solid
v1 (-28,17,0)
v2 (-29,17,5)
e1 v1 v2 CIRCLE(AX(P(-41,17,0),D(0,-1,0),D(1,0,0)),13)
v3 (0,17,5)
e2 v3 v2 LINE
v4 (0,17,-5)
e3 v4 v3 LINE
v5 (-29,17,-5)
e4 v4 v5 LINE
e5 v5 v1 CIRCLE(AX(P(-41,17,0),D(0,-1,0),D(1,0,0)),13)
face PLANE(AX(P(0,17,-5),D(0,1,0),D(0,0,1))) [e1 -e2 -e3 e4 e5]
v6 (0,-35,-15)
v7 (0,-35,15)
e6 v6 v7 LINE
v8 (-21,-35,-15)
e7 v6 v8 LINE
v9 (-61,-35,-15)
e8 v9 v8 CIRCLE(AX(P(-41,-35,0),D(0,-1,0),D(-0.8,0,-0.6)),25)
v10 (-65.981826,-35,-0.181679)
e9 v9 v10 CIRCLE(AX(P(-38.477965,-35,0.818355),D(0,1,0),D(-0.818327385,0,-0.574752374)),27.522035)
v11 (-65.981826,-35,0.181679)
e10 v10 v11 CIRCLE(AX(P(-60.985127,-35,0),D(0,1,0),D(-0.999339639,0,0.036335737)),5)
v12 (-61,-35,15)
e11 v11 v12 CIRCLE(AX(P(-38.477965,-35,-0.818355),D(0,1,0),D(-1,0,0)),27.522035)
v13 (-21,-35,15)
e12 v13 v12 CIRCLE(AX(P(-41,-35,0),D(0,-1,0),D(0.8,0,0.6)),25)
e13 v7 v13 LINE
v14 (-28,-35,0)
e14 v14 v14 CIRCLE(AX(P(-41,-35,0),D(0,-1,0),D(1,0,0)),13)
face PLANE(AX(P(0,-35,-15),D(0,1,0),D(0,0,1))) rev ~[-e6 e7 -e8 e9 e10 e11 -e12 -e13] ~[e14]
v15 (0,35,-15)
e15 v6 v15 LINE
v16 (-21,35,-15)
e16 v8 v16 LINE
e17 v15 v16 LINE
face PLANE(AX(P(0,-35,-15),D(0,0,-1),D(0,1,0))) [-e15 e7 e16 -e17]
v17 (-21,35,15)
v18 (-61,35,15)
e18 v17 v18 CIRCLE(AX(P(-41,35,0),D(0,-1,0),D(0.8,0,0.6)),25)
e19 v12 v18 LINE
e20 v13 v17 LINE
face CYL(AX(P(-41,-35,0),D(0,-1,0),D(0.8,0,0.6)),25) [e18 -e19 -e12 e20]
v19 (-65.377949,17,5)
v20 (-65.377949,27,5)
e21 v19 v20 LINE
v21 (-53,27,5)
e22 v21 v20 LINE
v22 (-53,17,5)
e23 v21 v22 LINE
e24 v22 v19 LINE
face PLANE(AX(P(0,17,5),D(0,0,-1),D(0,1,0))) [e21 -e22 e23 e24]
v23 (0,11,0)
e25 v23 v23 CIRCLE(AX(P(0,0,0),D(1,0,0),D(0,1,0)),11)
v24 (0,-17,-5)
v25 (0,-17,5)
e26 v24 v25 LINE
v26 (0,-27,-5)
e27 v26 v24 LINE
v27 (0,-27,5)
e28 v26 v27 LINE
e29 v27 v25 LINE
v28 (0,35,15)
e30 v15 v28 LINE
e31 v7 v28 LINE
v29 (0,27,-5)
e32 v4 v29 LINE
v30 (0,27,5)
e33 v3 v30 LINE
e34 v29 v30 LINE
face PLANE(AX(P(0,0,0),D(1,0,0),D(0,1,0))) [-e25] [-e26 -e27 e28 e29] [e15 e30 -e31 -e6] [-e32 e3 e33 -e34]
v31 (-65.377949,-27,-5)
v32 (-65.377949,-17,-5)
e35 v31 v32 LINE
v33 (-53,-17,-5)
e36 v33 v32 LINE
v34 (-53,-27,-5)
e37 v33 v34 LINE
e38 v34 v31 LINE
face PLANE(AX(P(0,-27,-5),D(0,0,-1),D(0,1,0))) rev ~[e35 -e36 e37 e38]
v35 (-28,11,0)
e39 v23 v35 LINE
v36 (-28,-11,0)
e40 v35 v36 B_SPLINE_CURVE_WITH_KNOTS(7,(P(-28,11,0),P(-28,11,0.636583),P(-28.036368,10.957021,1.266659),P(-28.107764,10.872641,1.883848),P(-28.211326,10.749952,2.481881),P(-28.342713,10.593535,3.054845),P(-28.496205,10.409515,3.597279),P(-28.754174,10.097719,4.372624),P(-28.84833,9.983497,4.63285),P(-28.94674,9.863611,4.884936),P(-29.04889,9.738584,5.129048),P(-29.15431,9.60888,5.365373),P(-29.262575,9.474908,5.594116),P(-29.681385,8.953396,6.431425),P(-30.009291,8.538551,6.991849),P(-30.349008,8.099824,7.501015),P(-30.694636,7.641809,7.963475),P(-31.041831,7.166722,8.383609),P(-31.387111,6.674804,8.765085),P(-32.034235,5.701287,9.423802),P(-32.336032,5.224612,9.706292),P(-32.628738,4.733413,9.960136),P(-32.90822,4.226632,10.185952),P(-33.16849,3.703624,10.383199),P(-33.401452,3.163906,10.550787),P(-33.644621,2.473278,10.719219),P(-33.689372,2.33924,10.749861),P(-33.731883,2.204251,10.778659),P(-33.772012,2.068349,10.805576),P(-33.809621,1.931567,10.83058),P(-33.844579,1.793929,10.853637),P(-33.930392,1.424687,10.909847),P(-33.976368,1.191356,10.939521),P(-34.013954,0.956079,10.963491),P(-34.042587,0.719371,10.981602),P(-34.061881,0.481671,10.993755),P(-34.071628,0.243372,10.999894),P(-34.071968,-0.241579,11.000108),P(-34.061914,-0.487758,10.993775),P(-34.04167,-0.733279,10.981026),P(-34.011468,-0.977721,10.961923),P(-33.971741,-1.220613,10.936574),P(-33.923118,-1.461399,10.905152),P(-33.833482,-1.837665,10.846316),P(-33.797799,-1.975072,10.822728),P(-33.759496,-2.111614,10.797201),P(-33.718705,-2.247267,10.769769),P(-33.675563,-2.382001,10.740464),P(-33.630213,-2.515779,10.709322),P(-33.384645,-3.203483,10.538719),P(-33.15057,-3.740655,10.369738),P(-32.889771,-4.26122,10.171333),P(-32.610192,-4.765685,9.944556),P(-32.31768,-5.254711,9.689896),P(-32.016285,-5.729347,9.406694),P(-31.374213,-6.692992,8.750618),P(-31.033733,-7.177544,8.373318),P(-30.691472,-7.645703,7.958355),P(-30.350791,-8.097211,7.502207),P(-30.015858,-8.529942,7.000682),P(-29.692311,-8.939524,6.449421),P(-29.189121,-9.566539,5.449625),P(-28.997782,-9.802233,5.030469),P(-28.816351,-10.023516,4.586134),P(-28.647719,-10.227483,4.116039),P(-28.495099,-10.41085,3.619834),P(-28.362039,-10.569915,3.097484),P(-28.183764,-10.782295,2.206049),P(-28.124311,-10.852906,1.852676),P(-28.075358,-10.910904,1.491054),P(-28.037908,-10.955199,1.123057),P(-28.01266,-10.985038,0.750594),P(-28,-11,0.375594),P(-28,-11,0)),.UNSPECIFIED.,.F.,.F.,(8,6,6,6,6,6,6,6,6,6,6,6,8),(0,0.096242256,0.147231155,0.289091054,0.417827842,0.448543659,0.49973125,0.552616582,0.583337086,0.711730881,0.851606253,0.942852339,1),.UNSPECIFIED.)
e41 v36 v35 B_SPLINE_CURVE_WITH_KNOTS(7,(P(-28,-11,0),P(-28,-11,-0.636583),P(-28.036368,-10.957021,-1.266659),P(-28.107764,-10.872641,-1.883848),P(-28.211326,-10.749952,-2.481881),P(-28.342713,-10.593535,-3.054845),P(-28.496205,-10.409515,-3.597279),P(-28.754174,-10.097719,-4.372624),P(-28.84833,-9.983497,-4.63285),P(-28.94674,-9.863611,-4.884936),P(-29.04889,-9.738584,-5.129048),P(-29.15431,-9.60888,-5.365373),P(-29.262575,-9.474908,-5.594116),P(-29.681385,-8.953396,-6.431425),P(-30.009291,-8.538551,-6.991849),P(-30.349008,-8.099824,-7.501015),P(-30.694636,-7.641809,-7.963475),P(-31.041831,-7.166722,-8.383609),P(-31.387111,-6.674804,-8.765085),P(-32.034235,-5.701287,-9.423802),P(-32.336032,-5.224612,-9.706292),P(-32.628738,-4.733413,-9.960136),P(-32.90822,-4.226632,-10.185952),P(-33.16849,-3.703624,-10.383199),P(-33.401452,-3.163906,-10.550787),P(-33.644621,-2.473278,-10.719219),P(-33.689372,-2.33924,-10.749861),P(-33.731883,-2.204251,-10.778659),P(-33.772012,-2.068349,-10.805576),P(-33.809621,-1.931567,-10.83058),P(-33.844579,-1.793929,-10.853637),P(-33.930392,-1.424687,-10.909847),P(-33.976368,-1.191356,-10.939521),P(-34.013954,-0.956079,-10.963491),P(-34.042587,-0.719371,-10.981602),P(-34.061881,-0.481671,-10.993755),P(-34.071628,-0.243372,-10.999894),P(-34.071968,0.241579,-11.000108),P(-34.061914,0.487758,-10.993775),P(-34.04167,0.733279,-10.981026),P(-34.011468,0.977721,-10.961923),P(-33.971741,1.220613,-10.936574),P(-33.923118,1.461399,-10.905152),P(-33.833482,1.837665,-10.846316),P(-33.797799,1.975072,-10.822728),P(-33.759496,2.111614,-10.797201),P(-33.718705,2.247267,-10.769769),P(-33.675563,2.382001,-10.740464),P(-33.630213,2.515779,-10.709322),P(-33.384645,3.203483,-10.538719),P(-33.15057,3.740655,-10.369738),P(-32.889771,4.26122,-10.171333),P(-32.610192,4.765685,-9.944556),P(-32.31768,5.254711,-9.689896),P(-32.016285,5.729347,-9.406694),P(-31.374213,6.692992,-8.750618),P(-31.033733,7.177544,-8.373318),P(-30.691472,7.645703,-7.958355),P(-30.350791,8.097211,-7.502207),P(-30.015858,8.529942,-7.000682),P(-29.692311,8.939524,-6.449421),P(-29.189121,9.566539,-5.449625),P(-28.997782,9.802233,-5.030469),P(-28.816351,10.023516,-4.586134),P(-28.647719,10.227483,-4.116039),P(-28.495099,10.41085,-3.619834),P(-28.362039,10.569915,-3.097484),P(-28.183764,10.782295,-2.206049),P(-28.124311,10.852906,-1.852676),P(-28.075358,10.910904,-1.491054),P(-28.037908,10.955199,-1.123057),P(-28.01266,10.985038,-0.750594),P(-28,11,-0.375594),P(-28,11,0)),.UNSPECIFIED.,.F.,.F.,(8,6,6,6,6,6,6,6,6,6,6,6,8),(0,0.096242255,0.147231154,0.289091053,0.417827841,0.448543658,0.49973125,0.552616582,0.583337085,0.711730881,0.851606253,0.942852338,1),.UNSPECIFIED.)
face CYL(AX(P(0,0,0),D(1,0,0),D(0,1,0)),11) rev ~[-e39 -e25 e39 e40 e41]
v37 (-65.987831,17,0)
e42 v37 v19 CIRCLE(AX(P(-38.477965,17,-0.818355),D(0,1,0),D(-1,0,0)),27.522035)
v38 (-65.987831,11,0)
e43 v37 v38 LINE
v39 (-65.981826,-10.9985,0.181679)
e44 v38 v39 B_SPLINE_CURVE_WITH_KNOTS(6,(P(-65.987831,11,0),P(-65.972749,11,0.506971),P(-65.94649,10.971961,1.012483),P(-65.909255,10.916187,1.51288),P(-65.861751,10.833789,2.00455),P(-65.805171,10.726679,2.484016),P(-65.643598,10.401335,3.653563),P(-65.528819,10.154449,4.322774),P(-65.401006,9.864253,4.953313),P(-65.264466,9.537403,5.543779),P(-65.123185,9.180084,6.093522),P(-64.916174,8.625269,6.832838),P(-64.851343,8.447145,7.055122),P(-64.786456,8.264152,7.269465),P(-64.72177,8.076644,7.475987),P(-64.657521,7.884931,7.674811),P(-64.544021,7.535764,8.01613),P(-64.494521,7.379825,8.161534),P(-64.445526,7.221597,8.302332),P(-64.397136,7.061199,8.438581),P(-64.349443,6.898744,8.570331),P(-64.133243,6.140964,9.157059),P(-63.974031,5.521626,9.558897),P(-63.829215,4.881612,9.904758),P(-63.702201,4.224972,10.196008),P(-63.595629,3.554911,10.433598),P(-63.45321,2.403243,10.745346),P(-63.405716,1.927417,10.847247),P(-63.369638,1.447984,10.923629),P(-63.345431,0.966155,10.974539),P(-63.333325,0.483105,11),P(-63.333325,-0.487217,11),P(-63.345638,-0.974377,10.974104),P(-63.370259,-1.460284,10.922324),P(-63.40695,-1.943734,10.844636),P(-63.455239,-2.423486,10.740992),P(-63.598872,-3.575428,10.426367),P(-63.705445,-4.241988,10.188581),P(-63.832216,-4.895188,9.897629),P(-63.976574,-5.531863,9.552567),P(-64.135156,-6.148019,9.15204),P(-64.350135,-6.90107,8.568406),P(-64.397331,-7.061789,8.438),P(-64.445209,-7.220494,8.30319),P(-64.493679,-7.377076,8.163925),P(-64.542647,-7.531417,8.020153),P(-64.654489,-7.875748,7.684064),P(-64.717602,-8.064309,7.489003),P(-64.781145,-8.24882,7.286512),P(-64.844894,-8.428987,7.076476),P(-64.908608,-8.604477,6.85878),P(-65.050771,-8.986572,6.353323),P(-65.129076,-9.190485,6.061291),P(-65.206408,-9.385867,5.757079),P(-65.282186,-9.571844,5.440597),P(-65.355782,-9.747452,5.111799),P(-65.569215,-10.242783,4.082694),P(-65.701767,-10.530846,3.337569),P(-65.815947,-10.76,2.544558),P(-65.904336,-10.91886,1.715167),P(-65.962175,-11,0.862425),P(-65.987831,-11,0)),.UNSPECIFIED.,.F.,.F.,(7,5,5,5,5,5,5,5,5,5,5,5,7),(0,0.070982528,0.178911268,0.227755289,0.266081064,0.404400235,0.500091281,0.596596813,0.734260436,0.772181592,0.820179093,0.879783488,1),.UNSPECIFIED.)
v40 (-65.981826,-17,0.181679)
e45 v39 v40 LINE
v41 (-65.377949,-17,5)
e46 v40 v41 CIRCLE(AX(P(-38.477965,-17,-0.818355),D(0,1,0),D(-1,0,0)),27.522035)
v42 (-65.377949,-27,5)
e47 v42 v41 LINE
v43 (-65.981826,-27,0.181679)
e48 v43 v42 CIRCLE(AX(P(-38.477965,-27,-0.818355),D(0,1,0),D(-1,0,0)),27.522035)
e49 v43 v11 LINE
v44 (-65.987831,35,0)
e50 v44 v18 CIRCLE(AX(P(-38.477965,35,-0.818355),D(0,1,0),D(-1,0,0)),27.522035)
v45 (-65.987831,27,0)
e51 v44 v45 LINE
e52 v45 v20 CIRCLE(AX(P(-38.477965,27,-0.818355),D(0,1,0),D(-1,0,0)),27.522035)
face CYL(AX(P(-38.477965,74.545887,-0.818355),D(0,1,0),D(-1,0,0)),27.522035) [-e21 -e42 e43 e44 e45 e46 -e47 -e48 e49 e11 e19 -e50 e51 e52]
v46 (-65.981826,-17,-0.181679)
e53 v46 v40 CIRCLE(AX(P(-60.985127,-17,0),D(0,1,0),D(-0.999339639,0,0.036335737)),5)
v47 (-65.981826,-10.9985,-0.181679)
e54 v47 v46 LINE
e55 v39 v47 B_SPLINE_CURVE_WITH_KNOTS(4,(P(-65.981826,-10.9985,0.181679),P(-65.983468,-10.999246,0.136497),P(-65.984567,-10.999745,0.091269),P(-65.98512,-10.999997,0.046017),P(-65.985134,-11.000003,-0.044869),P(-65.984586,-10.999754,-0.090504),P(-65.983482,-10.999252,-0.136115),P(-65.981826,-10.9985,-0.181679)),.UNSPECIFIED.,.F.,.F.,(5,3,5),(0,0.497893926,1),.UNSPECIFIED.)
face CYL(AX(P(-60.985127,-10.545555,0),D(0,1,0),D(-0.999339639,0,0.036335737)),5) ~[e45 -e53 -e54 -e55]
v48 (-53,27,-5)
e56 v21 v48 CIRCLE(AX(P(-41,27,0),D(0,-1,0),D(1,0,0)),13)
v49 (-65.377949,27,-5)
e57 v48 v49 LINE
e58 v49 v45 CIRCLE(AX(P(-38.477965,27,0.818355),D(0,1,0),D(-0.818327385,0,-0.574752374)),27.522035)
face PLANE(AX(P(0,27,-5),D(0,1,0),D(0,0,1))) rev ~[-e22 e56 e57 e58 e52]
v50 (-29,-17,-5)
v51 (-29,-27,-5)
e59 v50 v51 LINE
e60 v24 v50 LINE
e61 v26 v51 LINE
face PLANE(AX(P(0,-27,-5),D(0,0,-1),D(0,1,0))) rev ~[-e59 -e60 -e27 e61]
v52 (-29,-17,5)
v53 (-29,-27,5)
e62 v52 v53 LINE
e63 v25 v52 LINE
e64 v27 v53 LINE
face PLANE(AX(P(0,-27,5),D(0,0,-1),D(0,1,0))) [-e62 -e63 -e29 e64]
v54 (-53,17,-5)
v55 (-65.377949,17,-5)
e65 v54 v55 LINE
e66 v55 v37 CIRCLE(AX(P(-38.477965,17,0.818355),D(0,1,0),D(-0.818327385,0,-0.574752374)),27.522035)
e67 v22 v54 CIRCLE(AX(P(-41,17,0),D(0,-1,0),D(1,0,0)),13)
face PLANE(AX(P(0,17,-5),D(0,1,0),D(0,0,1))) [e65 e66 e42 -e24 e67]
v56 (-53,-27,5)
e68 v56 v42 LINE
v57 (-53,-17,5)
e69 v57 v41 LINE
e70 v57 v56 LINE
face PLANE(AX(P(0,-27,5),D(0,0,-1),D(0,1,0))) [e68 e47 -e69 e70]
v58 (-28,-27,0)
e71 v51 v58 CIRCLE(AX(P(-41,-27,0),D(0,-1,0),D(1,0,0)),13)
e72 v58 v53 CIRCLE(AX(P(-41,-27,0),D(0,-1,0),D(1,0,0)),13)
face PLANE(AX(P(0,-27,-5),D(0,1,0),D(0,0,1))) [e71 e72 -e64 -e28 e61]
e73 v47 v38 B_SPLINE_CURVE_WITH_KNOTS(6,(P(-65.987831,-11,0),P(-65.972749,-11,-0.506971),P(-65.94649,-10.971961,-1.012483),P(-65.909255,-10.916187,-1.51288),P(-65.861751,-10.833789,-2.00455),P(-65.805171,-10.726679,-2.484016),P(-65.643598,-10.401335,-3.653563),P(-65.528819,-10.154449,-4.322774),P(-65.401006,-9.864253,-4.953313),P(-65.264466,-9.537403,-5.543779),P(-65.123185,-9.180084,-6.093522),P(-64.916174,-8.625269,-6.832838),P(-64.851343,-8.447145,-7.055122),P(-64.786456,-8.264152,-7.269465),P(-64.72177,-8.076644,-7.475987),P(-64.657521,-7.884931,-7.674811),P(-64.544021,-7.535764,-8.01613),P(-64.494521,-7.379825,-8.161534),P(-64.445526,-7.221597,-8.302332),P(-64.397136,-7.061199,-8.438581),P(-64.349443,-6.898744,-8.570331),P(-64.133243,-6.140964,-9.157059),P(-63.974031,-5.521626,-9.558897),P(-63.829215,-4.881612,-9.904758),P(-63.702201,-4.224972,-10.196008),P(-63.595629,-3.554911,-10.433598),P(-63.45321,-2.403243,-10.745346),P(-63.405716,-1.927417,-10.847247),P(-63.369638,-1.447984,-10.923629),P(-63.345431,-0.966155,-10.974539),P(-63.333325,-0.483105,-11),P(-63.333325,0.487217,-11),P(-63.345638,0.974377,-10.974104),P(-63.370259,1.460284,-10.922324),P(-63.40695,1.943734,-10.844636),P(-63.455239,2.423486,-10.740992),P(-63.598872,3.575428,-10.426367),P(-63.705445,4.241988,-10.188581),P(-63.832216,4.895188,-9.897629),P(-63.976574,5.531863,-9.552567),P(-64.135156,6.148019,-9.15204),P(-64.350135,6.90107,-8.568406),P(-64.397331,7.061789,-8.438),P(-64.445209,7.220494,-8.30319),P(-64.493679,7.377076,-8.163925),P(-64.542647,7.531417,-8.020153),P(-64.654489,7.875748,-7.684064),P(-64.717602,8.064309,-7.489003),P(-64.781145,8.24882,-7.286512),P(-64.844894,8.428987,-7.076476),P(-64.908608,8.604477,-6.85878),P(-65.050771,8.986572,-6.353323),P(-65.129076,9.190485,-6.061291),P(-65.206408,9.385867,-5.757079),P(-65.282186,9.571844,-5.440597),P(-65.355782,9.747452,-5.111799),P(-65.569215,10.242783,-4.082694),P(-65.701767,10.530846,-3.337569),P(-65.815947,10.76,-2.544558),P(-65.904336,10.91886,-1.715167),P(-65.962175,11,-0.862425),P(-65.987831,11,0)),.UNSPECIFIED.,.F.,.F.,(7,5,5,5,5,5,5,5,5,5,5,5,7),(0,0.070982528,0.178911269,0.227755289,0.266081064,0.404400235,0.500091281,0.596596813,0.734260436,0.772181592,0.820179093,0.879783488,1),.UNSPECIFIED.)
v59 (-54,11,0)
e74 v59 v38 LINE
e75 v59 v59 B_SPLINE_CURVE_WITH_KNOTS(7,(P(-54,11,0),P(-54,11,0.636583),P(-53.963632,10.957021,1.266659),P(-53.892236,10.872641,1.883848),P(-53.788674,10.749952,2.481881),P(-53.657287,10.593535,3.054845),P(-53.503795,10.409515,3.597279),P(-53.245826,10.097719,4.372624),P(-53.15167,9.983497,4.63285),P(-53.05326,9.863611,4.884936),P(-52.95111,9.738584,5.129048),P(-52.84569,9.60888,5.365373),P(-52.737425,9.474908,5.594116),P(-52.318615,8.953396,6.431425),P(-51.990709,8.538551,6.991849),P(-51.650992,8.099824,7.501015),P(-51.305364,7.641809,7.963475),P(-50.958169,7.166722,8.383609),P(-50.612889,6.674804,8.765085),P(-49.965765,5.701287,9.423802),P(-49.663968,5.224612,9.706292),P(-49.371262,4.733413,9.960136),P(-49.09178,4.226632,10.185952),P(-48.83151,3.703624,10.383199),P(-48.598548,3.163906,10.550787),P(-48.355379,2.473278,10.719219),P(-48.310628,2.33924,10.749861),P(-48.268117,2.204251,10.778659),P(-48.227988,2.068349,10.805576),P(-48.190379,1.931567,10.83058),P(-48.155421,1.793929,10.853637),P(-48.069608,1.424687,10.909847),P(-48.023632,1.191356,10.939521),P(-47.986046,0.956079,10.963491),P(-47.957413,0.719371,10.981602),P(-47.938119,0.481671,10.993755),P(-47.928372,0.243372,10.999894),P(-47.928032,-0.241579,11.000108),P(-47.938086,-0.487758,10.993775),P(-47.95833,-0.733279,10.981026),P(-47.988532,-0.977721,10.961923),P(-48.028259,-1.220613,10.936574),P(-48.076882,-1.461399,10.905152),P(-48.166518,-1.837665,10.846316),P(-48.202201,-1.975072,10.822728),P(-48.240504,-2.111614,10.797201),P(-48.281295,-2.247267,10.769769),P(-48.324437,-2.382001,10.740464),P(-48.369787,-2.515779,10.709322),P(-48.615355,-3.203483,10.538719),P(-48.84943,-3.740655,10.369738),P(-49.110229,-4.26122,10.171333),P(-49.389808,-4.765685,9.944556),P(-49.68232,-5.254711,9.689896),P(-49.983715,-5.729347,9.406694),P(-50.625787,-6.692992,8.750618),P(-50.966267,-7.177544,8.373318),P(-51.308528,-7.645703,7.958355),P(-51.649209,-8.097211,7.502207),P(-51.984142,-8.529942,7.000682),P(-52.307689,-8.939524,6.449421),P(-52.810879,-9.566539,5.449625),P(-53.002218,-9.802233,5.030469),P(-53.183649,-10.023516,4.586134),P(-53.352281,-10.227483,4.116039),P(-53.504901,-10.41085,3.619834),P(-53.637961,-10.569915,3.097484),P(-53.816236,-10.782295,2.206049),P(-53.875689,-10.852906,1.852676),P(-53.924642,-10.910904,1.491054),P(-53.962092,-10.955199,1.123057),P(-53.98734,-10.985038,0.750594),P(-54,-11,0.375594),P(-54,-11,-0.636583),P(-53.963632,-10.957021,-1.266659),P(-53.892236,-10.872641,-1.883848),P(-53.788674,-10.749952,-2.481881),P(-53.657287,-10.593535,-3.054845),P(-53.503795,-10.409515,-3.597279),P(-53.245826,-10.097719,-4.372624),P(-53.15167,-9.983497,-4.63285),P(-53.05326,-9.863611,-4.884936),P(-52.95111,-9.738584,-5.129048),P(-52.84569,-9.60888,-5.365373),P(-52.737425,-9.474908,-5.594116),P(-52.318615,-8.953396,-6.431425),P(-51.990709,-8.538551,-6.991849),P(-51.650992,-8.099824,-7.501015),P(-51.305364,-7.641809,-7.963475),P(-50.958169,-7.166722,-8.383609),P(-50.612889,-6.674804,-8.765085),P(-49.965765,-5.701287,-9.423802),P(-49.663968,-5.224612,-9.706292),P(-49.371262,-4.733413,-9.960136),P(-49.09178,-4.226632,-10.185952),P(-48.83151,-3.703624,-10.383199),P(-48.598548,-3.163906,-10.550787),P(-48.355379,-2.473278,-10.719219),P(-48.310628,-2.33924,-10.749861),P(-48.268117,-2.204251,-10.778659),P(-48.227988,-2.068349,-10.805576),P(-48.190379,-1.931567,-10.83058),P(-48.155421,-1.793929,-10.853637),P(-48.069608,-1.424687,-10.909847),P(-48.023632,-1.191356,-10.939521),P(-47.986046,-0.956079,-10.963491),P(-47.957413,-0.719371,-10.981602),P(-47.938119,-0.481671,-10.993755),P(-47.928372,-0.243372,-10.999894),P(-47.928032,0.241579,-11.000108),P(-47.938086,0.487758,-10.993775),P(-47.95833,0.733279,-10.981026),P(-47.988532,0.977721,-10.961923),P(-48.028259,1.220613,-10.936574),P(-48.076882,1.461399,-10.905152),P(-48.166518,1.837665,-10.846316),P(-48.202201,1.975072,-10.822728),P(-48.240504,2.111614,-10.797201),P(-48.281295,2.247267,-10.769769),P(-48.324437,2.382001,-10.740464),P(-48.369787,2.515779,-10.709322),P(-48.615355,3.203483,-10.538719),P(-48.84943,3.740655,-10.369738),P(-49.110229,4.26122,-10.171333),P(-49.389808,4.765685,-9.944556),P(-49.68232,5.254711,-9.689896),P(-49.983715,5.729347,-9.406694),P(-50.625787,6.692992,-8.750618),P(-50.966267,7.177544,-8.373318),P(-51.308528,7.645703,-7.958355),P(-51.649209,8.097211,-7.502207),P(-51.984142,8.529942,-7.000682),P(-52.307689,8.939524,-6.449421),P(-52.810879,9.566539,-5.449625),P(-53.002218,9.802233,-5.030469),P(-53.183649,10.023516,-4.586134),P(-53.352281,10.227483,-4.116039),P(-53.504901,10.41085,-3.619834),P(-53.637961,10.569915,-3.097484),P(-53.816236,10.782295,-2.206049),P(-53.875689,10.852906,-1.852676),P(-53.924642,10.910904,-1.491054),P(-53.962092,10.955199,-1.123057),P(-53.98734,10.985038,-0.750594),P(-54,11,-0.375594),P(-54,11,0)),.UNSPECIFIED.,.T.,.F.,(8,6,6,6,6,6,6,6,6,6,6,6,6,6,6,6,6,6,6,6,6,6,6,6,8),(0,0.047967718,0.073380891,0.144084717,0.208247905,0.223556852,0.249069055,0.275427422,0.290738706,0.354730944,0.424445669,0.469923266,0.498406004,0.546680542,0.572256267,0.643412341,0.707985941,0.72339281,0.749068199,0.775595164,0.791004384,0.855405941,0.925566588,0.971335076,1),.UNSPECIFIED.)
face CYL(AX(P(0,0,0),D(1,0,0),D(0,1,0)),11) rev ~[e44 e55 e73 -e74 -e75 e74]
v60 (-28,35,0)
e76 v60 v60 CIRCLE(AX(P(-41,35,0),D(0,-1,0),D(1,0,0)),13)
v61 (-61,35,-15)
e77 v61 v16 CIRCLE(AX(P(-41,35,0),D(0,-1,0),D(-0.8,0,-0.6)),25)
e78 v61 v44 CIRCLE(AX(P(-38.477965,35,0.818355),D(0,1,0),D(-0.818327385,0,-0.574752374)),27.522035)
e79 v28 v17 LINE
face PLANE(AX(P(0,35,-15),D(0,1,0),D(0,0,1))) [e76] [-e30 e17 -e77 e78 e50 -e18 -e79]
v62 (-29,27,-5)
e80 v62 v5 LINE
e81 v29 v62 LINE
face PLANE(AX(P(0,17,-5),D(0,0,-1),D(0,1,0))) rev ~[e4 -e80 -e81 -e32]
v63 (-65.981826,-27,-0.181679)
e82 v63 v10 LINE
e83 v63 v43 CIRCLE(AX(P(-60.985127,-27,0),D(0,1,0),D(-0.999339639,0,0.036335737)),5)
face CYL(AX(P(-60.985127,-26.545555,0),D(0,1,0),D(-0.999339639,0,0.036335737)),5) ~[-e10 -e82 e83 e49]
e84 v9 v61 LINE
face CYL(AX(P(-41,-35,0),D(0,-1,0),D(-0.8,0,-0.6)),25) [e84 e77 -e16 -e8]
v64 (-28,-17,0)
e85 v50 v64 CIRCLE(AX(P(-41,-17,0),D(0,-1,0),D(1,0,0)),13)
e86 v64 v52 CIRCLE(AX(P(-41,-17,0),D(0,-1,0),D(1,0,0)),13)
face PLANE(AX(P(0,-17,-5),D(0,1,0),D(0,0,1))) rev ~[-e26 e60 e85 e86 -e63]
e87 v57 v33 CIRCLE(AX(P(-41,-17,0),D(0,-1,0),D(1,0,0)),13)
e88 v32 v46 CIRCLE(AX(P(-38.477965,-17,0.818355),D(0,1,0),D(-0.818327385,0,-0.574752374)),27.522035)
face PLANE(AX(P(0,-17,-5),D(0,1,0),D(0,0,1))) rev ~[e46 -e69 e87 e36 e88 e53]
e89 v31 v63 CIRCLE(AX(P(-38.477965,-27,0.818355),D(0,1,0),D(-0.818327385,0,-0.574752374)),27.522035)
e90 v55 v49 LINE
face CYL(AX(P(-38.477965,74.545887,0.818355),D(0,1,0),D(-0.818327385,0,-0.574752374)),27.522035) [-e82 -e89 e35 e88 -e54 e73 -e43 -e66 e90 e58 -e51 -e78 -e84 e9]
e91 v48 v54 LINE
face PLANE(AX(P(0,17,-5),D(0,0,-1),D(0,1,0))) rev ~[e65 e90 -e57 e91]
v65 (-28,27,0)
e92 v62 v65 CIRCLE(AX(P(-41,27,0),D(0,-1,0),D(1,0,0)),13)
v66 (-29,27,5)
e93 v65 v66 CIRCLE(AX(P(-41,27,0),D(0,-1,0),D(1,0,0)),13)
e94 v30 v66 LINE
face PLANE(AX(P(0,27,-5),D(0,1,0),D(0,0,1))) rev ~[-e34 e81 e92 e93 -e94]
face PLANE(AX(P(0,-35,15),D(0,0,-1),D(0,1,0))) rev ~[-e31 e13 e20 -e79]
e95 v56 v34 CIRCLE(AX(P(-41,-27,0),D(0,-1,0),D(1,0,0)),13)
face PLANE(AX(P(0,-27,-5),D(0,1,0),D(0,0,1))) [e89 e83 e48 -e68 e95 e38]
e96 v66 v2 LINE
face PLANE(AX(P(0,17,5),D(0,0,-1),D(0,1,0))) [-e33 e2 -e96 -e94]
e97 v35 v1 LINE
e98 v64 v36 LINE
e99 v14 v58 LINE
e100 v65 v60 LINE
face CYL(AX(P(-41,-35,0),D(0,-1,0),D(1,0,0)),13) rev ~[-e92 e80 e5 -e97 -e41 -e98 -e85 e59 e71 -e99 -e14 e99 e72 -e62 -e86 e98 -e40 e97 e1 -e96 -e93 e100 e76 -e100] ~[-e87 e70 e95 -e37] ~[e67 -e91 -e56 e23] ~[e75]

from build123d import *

# Parameters (mm, degrees)
F0_W        = 70
F0_H        = 30
F1_DEPTH    = 66
F3_DEPTH    = 70
F4_R        = 13
F5_DEPTH    = 71
F6_W        = 10
F6_H        = 10
F6_R        = 11
F7_DEPTH    = 70
F8_T1_DEPTH = 149.09177361
F9_T1_DEPTH = 8.9088895058
F9_T3_DEPTH = 6.9088895058


# Not quite as in the source:
# - a fillet or chamfer that OpenCascade refuses, or shapes differently, is made with other operations: its cross-section is extruded or revolved along the edge and cut away or added


with BuildPart() as f1:
    # F0 (on Right) → F1 (new body)
    with BuildSketch(Plane.YZ):
        Rectangle(F0_W, F0_H)
    extrude(amount=-F1_DEPTH)

    # F2 (on face) → F3 (join)
    with BuildSketch(Plane.XZ.offset(35)):
        with BuildLine():
            Line((-41, 15), (-21, 15))
            ThreePointArc((-21, 15), (-41, 25), (-61, 15))
            Line((-61, 15), (-41, 15))
        make_face()
        with BuildLine():
            ThreePointArc((-61, -15), (-41, -25), (-21, -15))
            Line((-21, -15), (-61, -15))
        make_face()
    extrude(amount=-F3_DEPTH)

    # F4 (on face) → F5 (cut)
    with BuildSketch(Plane.XZ.offset(35)):
        with Locations((-41, 0)):
            Circle(F4_R)
    extrude(amount=-F5_DEPTH, mode=Mode.SUBTRACT)

    # F6 (on face) → F7 (cut)
    with BuildSketch(Plane.YZ):
        with Locations((-22, 0)):
            Rectangle(F6_W, F6_H)
        Circle(F6_R)
        with Locations((22, 0)):
            Rectangle(F6_W, F6_H)
    extrude(amount=-F7_DEPTH, mode=Mode.SUBTRACT)

    # F8: fillet of radius 27.5220346111 on 2 edges, made by hand

    # F8_s2 → F8_t1 (cut)
    with BuildSketch(Plane.XZ.offset(-74.545886805)):
        with BuildLine():
            ThreePointArc((-66, -0.818354722), (-64.7202462083, 7.4765284314), (-61, 15))
            Line((-61, 15), (-66, 15))
            Line((-66, 15), (-66, -0.818354722))
        make_face()
        with BuildLine():
            ThreePointArc((-61, -15), (-64.7202462083, -7.4765284314), (-66, 0.818354722))
            Line((-66, 0.818354722), (-66, -15))
            Line((-66, -15), (-61, -15))
        make_face()
    extrude(amount=F8_T1_DEPTH, mode=Mode.SUBTRACT)

    # F9: fillet of radius 5 on 2 edges, made by hand

    # F9_s2 → F9_t1 (cut)
    with BuildSketch(Plane.XZ.offset(26.5455552471)):
        with BuildLine():
            ThreePointArc((-65.9818255238, 0.1816786841), (-65.9851273284, 0), (-65.9818255238, -0.1816786841))
            ThreePointArc((-65.9818255238, -0.1816786841), (-65.9849780634, -0.0908442999), (-65.9878306136, 0))
            ThreePointArc((-65.9878306136, 0), (-65.9849780634, 0.0908442999), (-65.9818255238, 0.1816786841))
        make_face()
    extrude(amount=F9_T1_DEPTH, mode=Mode.SUBTRACT)

    # F9_s4 → F9_t3 (cut)
    with BuildSketch(Plane.XZ.offset(10.5455552471)):
        with BuildLine():
            ThreePointArc((-65.9818255238, 0.1816786841), (-65.9851273284, 0), (-65.9818255238, -0.1816786841))
            ThreePointArc((-65.9818255238, -0.1816786841), (-65.9849780634, -0.0908442999), (-65.9878306136, 0))
            ThreePointArc((-65.9878306136, 0), (-65.9849780634, 0.0908442999), (-65.9818255238, 0.1816786841))
        make_face()
    extrude(amount=F9_T3_DEPTH, mode=Mode.SUBTRACT)


solid = f1.part
